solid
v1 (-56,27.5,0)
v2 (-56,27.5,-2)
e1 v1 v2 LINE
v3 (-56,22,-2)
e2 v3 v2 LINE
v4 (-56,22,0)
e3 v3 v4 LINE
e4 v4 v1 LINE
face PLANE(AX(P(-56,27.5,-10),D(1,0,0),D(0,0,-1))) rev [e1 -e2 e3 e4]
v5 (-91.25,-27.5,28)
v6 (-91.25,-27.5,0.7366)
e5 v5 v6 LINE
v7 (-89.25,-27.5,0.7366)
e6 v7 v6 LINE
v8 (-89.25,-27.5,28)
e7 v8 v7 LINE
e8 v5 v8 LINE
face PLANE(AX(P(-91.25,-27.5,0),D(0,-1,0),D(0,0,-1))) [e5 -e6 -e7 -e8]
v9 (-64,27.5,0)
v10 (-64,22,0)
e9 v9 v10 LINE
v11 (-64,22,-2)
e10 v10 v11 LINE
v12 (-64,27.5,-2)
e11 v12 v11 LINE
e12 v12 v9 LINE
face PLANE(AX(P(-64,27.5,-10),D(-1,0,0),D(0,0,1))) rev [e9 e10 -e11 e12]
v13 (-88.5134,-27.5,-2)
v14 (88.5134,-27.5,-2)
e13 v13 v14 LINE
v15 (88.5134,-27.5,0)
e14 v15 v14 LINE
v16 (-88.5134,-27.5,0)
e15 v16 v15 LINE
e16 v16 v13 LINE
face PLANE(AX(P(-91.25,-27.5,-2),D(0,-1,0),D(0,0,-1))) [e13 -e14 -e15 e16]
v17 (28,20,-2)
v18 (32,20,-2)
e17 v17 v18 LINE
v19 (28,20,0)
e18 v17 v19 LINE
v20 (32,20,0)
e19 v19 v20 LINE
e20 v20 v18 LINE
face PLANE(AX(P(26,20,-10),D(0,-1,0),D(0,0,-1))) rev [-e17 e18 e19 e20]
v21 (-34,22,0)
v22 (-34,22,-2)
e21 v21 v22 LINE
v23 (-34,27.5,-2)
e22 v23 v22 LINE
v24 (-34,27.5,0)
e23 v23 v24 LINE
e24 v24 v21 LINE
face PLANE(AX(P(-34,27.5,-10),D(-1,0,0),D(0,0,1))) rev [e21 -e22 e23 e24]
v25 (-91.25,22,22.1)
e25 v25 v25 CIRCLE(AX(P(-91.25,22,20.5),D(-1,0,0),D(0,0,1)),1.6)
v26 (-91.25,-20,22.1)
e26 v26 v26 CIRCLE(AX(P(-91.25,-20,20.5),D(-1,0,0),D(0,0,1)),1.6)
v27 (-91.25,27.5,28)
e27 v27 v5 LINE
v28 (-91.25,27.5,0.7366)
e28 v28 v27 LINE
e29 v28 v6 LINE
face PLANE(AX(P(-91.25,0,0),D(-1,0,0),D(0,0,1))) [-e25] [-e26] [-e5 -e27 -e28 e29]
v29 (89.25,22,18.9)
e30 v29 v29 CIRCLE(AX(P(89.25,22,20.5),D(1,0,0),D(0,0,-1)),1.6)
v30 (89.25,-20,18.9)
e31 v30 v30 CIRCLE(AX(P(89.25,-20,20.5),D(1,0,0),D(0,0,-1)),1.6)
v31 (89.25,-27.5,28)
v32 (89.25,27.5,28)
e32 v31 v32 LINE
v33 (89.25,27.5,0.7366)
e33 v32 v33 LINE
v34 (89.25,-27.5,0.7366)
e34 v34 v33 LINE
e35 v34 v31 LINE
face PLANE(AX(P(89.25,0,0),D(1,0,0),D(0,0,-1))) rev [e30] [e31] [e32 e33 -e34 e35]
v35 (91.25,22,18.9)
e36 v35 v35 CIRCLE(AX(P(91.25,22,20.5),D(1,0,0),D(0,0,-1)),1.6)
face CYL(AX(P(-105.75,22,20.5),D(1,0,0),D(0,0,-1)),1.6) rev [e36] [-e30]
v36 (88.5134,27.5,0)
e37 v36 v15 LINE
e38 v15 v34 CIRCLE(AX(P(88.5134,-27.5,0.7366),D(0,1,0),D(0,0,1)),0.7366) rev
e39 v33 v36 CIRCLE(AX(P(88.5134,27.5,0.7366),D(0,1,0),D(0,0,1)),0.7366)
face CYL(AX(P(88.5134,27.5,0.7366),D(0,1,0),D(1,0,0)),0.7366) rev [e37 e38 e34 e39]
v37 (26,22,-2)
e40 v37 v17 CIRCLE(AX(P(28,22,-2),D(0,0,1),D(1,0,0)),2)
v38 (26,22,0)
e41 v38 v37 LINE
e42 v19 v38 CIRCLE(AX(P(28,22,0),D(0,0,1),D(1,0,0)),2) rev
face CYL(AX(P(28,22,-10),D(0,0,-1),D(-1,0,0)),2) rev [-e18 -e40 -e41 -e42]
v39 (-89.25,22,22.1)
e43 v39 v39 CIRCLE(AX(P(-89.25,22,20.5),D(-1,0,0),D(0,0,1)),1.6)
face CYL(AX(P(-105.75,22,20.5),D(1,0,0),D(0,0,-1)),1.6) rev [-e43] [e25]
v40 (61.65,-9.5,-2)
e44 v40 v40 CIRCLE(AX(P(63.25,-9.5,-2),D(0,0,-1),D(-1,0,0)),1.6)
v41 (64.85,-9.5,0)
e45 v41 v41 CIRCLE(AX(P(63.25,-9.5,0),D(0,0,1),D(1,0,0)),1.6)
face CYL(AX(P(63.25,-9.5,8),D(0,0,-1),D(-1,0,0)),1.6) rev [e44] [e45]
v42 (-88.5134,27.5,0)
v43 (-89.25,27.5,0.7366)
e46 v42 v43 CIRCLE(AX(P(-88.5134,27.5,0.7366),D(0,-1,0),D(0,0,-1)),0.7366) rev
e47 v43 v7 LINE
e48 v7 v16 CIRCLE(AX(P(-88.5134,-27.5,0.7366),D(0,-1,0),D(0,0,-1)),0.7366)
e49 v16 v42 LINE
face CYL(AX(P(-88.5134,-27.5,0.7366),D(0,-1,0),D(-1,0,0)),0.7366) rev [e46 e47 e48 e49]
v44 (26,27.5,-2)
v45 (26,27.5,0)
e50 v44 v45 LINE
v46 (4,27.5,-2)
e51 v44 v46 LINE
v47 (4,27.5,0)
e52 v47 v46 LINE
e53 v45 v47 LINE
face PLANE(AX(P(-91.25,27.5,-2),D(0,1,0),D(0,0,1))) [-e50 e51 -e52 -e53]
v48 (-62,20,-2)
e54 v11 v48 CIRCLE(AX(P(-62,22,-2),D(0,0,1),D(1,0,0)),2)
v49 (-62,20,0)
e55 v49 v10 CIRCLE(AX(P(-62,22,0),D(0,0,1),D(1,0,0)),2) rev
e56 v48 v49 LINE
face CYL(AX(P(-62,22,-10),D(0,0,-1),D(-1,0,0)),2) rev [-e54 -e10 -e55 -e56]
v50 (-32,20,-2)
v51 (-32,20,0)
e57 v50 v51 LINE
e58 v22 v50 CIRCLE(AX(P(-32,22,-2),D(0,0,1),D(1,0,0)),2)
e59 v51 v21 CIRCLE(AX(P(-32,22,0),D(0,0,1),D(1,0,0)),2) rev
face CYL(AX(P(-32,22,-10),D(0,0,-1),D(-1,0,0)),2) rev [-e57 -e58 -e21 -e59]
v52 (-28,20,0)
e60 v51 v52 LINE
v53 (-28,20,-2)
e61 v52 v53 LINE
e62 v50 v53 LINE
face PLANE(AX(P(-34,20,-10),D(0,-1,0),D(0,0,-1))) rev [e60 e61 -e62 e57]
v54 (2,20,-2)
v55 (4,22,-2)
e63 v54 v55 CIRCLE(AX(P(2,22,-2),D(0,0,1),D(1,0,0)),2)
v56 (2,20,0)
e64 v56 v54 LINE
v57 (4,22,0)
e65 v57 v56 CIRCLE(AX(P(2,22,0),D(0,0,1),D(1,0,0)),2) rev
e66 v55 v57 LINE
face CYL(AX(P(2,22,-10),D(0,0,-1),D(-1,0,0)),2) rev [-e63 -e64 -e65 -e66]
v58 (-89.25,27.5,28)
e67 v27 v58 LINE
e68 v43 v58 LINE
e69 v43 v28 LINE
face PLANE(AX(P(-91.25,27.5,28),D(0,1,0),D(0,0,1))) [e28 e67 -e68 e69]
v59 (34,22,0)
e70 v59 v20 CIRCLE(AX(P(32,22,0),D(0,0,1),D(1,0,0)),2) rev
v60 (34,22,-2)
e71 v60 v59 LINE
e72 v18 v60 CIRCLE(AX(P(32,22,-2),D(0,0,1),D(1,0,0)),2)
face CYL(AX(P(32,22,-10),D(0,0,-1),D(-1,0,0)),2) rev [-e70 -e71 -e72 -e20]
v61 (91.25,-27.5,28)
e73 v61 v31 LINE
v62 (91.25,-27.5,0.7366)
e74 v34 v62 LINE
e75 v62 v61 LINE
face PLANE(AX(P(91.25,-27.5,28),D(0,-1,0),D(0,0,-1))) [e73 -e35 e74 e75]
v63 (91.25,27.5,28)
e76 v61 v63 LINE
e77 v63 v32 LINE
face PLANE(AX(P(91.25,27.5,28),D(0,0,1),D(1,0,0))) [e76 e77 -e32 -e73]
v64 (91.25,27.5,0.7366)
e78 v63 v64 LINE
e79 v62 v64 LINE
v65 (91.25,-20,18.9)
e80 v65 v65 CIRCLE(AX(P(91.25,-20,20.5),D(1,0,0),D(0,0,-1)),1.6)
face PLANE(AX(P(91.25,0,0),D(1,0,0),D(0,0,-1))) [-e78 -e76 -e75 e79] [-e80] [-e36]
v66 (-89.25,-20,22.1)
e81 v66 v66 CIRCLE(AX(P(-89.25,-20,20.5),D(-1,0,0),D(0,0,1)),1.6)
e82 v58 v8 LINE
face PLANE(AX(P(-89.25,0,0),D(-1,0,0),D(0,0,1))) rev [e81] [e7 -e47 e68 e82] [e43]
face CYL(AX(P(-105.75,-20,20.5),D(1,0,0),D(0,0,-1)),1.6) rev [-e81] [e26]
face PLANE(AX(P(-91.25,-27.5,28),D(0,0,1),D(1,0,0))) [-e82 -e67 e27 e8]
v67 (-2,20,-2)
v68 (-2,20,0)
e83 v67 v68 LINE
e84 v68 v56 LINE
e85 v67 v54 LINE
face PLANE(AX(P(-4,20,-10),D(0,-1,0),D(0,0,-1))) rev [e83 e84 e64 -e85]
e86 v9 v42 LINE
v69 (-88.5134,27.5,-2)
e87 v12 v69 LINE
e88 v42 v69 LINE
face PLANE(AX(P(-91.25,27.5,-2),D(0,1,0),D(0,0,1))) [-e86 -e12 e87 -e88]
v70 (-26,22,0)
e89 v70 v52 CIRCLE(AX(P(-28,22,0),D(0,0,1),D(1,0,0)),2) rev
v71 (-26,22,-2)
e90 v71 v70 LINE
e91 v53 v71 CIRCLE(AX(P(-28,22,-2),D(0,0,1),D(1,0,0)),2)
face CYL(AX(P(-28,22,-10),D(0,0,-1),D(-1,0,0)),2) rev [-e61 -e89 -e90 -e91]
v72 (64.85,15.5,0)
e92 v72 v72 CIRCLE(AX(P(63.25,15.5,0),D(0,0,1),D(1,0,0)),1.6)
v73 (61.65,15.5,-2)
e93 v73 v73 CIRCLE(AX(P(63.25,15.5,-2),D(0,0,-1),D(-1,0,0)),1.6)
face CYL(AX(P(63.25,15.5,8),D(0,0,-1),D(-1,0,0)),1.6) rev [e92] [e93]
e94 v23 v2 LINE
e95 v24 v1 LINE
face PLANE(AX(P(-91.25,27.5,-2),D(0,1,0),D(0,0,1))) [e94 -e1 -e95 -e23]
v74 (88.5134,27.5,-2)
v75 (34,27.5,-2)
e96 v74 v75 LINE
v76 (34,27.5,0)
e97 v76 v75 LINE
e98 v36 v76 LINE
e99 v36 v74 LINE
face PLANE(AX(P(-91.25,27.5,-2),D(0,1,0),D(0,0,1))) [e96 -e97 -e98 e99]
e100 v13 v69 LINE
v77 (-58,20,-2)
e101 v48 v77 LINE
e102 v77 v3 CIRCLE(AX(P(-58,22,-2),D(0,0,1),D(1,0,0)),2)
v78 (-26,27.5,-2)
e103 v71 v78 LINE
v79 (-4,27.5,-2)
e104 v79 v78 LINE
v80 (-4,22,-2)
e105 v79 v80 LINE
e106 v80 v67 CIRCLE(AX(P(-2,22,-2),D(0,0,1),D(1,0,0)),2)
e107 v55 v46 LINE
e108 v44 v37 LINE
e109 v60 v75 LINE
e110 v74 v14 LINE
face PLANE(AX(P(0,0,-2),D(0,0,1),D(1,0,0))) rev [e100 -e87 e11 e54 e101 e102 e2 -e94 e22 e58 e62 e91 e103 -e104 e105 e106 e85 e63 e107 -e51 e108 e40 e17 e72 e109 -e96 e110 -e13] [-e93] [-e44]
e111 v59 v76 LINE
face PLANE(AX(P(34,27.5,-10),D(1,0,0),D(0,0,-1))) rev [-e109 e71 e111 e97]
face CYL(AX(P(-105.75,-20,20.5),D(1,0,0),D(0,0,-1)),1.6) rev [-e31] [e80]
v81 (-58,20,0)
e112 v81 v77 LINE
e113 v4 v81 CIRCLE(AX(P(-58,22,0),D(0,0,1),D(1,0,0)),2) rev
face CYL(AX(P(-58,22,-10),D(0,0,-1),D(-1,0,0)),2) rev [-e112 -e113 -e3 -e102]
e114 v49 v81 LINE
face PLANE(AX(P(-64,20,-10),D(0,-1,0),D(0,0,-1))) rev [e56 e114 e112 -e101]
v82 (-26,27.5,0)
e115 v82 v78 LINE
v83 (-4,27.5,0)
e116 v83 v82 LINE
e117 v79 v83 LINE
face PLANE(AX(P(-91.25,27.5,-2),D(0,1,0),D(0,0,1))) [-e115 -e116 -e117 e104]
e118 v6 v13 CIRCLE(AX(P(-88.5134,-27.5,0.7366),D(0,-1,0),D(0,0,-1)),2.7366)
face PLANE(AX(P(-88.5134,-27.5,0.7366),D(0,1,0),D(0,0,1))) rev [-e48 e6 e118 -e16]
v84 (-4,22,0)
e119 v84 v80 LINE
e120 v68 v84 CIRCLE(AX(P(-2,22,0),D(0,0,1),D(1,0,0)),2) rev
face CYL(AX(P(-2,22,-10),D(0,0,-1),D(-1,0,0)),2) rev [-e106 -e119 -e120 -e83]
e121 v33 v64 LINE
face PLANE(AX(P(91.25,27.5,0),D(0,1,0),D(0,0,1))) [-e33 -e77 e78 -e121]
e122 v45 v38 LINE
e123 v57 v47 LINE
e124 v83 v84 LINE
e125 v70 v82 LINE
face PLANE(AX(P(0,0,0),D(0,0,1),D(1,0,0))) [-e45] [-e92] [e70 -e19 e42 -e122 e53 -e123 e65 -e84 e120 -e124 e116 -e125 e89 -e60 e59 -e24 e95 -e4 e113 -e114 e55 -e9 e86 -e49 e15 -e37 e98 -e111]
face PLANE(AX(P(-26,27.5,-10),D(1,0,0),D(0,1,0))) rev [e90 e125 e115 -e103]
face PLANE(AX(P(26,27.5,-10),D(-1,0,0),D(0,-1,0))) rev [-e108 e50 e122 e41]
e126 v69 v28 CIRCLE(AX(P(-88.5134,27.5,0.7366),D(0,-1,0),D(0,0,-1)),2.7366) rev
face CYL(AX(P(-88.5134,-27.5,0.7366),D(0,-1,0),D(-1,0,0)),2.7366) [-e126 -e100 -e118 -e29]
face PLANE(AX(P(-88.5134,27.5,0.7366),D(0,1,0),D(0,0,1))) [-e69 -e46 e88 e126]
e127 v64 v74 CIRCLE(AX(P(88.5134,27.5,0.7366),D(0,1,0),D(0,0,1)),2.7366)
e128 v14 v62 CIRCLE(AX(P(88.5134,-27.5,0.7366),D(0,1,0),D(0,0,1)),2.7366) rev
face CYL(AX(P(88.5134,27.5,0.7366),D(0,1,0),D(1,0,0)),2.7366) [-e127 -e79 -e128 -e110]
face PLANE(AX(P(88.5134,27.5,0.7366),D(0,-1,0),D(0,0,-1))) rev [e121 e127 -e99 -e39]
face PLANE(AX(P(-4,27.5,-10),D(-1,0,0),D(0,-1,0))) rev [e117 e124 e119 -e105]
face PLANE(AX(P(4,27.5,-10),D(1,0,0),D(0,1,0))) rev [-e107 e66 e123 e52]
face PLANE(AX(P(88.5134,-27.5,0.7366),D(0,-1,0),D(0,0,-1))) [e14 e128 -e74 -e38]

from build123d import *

# Parameters (mm, degrees)
SKETCH_1_W                         = 182.5
SKETCH_1_H                         = 55
SM_BASE_FLANGE_1_DEPTH             = 2
SM_EDGE_FLANGE_1_STRIP_W           = 9.4732
SM_EDGE_FLANGE_1_STRIP_H           = 2
SM_EDGE_FLANGE_1_STRIP_CUT_DEPTH   = 55
SM_EDGE_FLANGE_1_STRIP_2_W         = 9.4732
SM_EDGE_FLANGE_1_STRIP_2_H         = 2
SM_EDGE_FLANGE_1_STRIP_CUT_2_DEPTH = 55
SM_EDGE_FLANGE_1_DEPTH             = 55
SM_EDGE_FLANGE_1_BEND_DEPTH        = 55
SKETCH_12_W                        = 8
SKETCH_12_H                        = 7.5
CUT_EXTRUDE_1_DEPTH                = 10
FILLET_1_R                         = 2
SKETCH_13_R                        = 1.6
CUT_EXTRUDE_2_DEPTH                = 197
SKETCH_14_R                        = 1.6
CUT_EXTRUDE_3_DEPTH                = 10


# Sheet-metal steps are written as plain solids
with BuildPart() as part:
    # Sketch 1 → Базовая кромка1 (new body)
    with BuildSketch(Plane.XY):
        Rectangle(SKETCH_1_W, SKETCH_1_H)
    extrude(amount=-SM_BASE_FLANGE_1_DEPTH)

    # Ребро-кромка1 strip (across the edge) → Ребро-кромка1 strip cut (cut)
    with BuildSketch(Plane(origin=(-91.25, 27.5, 0), x_dir=(1, 0, 0), z_dir=(0, -1, 0))):
        with Locations((-2, -1)):
            Rectangle(SM_EDGE_FLANGE_1_STRIP_W, SM_EDGE_FLANGE_1_STRIP_H)
    extrude(amount=SM_EDGE_FLANGE_1_STRIP_CUT_DEPTH, mode=Mode.SUBTRACT)

    # Ребро-кромка1 strip 2 (across the edge) → Ребро-кромка1 strip cut 2 (cut)
    with BuildSketch(Plane(origin=(91.25, -27.5, 0), x_dir=(-1, 0, 0), z_dir=(0, 1, 0))):
        with Locations((-2, -1)):
            Rectangle(SM_EDGE_FLANGE_1_STRIP_2_W, SM_EDGE_FLANGE_1_STRIP_2_H)
    extrude(amount=SM_EDGE_FLANGE_1_STRIP_CUT_2_DEPTH, mode=Mode.SUBTRACT)

    # Ребро-кромка1 section (across the edge) → Ребро-кромка1 (add)
    with BuildSketch(Plane(origin=(-91.25, 27.5, 0), x_dir=(1, 0, 0), z_dir=(0, -1, 0))):
        with BuildLine():
            Line((0, 0.7366), (0, 28))
            Line((0, 28), (2, 28))
            Line((2, 28), (2, 0.7366))
            ThreePointArc((2, 0.7366), (2.215745145, 0.215745145), (2.7366, 0))
            Line((2.7366, 0), (2.7366, -2))
            ThreePointArc((2.7366, -2), (0.801531583, -1.198468417), (0, 0.7366))
        make_face()
    extrude(amount=SM_EDGE_FLANGE_1_DEPTH)

    # Ребро-кромка1 section 2 (across the edge) → Ребро-кромка1 bend (add)
    with BuildSketch(Plane(origin=(91.25, -27.5, 0), x_dir=(-1, 0, 0), z_dir=(0, 1, 0))):
        with BuildLine():
            Line((0, 0.7366), (0, 28))
            Line((0, 28), (2, 28))
            Line((2, 28), (2, 0.7366))
            ThreePointArc((2, 0.7366), (2.215745145, 0.215745145), (2.7366, 0))
            Line((2.7366, 0), (2.7366, -2))
            ThreePointArc((2.7366, -2), (0.801531583, -1.198468417), (0, 0.7366))
        make_face()
    extrude(amount=SM_EDGE_FLANGE_1_BEND_DEPTH)

    # Эскиз12 → Вырез-Вытянуть1 (cut)
    with BuildSketch(Plane.XY):
        with Locations((0, 23.75)):
            Rectangle(SKETCH_12_W, SKETCH_12_H)
        with Locations((30, 23.75)):
            Rectangle(SKETCH_12_W, SKETCH_12_H)
        with Locations((-30, 23.75)):
            Rectangle(SKETCH_12_W, SKETCH_12_H)
        with Locations((-60, 23.75)):
            Rectangle(SKETCH_12_W, SKETCH_12_H)
    extrude(amount=-CUT_EXTRUDE_1_DEPTH, mode=Mode.SUBTRACT)

    # Скругление1
    fillet_1_edges = [part.edges().sort_by_distance(p)[0] for p in [
        (-56, 20, -1),
        (-64, 20, -1),
        (-26, 20, -1),
        (-34, 20, -1),
        (34, 20, -1),
        (26, 20, -1),
        (4, 20, -1),
        (-4, 20, -1),
    ]]
    fillet(fillet_1_edges, radius=FILLET_1_R)

    # Эскиз13 → Вырез-Вытянуть2 (cut)
    with BuildSketch(Plane(origin=(91.25, 0, 0), x_dir=(0, 0, -1), z_dir=(1, 0, 0))):
        with Locations((-20.5, -20)):
            Circle(SKETCH_13_R)
        with Locations((-20.5, 22)):
            Circle(SKETCH_13_R)
    extrude(amount=-CUT_EXTRUDE_2_DEPTH, mode=Mode.SUBTRACT)

    # Эскиз14 → Вырез-Вытянуть3 (cut)
    with BuildSketch(Plane(origin=(0, 0, -2), x_dir=(-1, 0, 0), z_dir=(0, 0, -1))):
        with Locations((-63.25, 15.5)):
            Circle(SKETCH_14_R)
        with Locations((-63.25, -9.5)):
            Circle(SKETCH_14_R)
    extrude(amount=-CUT_EXTRUDE_3_DEPTH, mode=Mode.SUBTRACT)


solid = part.part
